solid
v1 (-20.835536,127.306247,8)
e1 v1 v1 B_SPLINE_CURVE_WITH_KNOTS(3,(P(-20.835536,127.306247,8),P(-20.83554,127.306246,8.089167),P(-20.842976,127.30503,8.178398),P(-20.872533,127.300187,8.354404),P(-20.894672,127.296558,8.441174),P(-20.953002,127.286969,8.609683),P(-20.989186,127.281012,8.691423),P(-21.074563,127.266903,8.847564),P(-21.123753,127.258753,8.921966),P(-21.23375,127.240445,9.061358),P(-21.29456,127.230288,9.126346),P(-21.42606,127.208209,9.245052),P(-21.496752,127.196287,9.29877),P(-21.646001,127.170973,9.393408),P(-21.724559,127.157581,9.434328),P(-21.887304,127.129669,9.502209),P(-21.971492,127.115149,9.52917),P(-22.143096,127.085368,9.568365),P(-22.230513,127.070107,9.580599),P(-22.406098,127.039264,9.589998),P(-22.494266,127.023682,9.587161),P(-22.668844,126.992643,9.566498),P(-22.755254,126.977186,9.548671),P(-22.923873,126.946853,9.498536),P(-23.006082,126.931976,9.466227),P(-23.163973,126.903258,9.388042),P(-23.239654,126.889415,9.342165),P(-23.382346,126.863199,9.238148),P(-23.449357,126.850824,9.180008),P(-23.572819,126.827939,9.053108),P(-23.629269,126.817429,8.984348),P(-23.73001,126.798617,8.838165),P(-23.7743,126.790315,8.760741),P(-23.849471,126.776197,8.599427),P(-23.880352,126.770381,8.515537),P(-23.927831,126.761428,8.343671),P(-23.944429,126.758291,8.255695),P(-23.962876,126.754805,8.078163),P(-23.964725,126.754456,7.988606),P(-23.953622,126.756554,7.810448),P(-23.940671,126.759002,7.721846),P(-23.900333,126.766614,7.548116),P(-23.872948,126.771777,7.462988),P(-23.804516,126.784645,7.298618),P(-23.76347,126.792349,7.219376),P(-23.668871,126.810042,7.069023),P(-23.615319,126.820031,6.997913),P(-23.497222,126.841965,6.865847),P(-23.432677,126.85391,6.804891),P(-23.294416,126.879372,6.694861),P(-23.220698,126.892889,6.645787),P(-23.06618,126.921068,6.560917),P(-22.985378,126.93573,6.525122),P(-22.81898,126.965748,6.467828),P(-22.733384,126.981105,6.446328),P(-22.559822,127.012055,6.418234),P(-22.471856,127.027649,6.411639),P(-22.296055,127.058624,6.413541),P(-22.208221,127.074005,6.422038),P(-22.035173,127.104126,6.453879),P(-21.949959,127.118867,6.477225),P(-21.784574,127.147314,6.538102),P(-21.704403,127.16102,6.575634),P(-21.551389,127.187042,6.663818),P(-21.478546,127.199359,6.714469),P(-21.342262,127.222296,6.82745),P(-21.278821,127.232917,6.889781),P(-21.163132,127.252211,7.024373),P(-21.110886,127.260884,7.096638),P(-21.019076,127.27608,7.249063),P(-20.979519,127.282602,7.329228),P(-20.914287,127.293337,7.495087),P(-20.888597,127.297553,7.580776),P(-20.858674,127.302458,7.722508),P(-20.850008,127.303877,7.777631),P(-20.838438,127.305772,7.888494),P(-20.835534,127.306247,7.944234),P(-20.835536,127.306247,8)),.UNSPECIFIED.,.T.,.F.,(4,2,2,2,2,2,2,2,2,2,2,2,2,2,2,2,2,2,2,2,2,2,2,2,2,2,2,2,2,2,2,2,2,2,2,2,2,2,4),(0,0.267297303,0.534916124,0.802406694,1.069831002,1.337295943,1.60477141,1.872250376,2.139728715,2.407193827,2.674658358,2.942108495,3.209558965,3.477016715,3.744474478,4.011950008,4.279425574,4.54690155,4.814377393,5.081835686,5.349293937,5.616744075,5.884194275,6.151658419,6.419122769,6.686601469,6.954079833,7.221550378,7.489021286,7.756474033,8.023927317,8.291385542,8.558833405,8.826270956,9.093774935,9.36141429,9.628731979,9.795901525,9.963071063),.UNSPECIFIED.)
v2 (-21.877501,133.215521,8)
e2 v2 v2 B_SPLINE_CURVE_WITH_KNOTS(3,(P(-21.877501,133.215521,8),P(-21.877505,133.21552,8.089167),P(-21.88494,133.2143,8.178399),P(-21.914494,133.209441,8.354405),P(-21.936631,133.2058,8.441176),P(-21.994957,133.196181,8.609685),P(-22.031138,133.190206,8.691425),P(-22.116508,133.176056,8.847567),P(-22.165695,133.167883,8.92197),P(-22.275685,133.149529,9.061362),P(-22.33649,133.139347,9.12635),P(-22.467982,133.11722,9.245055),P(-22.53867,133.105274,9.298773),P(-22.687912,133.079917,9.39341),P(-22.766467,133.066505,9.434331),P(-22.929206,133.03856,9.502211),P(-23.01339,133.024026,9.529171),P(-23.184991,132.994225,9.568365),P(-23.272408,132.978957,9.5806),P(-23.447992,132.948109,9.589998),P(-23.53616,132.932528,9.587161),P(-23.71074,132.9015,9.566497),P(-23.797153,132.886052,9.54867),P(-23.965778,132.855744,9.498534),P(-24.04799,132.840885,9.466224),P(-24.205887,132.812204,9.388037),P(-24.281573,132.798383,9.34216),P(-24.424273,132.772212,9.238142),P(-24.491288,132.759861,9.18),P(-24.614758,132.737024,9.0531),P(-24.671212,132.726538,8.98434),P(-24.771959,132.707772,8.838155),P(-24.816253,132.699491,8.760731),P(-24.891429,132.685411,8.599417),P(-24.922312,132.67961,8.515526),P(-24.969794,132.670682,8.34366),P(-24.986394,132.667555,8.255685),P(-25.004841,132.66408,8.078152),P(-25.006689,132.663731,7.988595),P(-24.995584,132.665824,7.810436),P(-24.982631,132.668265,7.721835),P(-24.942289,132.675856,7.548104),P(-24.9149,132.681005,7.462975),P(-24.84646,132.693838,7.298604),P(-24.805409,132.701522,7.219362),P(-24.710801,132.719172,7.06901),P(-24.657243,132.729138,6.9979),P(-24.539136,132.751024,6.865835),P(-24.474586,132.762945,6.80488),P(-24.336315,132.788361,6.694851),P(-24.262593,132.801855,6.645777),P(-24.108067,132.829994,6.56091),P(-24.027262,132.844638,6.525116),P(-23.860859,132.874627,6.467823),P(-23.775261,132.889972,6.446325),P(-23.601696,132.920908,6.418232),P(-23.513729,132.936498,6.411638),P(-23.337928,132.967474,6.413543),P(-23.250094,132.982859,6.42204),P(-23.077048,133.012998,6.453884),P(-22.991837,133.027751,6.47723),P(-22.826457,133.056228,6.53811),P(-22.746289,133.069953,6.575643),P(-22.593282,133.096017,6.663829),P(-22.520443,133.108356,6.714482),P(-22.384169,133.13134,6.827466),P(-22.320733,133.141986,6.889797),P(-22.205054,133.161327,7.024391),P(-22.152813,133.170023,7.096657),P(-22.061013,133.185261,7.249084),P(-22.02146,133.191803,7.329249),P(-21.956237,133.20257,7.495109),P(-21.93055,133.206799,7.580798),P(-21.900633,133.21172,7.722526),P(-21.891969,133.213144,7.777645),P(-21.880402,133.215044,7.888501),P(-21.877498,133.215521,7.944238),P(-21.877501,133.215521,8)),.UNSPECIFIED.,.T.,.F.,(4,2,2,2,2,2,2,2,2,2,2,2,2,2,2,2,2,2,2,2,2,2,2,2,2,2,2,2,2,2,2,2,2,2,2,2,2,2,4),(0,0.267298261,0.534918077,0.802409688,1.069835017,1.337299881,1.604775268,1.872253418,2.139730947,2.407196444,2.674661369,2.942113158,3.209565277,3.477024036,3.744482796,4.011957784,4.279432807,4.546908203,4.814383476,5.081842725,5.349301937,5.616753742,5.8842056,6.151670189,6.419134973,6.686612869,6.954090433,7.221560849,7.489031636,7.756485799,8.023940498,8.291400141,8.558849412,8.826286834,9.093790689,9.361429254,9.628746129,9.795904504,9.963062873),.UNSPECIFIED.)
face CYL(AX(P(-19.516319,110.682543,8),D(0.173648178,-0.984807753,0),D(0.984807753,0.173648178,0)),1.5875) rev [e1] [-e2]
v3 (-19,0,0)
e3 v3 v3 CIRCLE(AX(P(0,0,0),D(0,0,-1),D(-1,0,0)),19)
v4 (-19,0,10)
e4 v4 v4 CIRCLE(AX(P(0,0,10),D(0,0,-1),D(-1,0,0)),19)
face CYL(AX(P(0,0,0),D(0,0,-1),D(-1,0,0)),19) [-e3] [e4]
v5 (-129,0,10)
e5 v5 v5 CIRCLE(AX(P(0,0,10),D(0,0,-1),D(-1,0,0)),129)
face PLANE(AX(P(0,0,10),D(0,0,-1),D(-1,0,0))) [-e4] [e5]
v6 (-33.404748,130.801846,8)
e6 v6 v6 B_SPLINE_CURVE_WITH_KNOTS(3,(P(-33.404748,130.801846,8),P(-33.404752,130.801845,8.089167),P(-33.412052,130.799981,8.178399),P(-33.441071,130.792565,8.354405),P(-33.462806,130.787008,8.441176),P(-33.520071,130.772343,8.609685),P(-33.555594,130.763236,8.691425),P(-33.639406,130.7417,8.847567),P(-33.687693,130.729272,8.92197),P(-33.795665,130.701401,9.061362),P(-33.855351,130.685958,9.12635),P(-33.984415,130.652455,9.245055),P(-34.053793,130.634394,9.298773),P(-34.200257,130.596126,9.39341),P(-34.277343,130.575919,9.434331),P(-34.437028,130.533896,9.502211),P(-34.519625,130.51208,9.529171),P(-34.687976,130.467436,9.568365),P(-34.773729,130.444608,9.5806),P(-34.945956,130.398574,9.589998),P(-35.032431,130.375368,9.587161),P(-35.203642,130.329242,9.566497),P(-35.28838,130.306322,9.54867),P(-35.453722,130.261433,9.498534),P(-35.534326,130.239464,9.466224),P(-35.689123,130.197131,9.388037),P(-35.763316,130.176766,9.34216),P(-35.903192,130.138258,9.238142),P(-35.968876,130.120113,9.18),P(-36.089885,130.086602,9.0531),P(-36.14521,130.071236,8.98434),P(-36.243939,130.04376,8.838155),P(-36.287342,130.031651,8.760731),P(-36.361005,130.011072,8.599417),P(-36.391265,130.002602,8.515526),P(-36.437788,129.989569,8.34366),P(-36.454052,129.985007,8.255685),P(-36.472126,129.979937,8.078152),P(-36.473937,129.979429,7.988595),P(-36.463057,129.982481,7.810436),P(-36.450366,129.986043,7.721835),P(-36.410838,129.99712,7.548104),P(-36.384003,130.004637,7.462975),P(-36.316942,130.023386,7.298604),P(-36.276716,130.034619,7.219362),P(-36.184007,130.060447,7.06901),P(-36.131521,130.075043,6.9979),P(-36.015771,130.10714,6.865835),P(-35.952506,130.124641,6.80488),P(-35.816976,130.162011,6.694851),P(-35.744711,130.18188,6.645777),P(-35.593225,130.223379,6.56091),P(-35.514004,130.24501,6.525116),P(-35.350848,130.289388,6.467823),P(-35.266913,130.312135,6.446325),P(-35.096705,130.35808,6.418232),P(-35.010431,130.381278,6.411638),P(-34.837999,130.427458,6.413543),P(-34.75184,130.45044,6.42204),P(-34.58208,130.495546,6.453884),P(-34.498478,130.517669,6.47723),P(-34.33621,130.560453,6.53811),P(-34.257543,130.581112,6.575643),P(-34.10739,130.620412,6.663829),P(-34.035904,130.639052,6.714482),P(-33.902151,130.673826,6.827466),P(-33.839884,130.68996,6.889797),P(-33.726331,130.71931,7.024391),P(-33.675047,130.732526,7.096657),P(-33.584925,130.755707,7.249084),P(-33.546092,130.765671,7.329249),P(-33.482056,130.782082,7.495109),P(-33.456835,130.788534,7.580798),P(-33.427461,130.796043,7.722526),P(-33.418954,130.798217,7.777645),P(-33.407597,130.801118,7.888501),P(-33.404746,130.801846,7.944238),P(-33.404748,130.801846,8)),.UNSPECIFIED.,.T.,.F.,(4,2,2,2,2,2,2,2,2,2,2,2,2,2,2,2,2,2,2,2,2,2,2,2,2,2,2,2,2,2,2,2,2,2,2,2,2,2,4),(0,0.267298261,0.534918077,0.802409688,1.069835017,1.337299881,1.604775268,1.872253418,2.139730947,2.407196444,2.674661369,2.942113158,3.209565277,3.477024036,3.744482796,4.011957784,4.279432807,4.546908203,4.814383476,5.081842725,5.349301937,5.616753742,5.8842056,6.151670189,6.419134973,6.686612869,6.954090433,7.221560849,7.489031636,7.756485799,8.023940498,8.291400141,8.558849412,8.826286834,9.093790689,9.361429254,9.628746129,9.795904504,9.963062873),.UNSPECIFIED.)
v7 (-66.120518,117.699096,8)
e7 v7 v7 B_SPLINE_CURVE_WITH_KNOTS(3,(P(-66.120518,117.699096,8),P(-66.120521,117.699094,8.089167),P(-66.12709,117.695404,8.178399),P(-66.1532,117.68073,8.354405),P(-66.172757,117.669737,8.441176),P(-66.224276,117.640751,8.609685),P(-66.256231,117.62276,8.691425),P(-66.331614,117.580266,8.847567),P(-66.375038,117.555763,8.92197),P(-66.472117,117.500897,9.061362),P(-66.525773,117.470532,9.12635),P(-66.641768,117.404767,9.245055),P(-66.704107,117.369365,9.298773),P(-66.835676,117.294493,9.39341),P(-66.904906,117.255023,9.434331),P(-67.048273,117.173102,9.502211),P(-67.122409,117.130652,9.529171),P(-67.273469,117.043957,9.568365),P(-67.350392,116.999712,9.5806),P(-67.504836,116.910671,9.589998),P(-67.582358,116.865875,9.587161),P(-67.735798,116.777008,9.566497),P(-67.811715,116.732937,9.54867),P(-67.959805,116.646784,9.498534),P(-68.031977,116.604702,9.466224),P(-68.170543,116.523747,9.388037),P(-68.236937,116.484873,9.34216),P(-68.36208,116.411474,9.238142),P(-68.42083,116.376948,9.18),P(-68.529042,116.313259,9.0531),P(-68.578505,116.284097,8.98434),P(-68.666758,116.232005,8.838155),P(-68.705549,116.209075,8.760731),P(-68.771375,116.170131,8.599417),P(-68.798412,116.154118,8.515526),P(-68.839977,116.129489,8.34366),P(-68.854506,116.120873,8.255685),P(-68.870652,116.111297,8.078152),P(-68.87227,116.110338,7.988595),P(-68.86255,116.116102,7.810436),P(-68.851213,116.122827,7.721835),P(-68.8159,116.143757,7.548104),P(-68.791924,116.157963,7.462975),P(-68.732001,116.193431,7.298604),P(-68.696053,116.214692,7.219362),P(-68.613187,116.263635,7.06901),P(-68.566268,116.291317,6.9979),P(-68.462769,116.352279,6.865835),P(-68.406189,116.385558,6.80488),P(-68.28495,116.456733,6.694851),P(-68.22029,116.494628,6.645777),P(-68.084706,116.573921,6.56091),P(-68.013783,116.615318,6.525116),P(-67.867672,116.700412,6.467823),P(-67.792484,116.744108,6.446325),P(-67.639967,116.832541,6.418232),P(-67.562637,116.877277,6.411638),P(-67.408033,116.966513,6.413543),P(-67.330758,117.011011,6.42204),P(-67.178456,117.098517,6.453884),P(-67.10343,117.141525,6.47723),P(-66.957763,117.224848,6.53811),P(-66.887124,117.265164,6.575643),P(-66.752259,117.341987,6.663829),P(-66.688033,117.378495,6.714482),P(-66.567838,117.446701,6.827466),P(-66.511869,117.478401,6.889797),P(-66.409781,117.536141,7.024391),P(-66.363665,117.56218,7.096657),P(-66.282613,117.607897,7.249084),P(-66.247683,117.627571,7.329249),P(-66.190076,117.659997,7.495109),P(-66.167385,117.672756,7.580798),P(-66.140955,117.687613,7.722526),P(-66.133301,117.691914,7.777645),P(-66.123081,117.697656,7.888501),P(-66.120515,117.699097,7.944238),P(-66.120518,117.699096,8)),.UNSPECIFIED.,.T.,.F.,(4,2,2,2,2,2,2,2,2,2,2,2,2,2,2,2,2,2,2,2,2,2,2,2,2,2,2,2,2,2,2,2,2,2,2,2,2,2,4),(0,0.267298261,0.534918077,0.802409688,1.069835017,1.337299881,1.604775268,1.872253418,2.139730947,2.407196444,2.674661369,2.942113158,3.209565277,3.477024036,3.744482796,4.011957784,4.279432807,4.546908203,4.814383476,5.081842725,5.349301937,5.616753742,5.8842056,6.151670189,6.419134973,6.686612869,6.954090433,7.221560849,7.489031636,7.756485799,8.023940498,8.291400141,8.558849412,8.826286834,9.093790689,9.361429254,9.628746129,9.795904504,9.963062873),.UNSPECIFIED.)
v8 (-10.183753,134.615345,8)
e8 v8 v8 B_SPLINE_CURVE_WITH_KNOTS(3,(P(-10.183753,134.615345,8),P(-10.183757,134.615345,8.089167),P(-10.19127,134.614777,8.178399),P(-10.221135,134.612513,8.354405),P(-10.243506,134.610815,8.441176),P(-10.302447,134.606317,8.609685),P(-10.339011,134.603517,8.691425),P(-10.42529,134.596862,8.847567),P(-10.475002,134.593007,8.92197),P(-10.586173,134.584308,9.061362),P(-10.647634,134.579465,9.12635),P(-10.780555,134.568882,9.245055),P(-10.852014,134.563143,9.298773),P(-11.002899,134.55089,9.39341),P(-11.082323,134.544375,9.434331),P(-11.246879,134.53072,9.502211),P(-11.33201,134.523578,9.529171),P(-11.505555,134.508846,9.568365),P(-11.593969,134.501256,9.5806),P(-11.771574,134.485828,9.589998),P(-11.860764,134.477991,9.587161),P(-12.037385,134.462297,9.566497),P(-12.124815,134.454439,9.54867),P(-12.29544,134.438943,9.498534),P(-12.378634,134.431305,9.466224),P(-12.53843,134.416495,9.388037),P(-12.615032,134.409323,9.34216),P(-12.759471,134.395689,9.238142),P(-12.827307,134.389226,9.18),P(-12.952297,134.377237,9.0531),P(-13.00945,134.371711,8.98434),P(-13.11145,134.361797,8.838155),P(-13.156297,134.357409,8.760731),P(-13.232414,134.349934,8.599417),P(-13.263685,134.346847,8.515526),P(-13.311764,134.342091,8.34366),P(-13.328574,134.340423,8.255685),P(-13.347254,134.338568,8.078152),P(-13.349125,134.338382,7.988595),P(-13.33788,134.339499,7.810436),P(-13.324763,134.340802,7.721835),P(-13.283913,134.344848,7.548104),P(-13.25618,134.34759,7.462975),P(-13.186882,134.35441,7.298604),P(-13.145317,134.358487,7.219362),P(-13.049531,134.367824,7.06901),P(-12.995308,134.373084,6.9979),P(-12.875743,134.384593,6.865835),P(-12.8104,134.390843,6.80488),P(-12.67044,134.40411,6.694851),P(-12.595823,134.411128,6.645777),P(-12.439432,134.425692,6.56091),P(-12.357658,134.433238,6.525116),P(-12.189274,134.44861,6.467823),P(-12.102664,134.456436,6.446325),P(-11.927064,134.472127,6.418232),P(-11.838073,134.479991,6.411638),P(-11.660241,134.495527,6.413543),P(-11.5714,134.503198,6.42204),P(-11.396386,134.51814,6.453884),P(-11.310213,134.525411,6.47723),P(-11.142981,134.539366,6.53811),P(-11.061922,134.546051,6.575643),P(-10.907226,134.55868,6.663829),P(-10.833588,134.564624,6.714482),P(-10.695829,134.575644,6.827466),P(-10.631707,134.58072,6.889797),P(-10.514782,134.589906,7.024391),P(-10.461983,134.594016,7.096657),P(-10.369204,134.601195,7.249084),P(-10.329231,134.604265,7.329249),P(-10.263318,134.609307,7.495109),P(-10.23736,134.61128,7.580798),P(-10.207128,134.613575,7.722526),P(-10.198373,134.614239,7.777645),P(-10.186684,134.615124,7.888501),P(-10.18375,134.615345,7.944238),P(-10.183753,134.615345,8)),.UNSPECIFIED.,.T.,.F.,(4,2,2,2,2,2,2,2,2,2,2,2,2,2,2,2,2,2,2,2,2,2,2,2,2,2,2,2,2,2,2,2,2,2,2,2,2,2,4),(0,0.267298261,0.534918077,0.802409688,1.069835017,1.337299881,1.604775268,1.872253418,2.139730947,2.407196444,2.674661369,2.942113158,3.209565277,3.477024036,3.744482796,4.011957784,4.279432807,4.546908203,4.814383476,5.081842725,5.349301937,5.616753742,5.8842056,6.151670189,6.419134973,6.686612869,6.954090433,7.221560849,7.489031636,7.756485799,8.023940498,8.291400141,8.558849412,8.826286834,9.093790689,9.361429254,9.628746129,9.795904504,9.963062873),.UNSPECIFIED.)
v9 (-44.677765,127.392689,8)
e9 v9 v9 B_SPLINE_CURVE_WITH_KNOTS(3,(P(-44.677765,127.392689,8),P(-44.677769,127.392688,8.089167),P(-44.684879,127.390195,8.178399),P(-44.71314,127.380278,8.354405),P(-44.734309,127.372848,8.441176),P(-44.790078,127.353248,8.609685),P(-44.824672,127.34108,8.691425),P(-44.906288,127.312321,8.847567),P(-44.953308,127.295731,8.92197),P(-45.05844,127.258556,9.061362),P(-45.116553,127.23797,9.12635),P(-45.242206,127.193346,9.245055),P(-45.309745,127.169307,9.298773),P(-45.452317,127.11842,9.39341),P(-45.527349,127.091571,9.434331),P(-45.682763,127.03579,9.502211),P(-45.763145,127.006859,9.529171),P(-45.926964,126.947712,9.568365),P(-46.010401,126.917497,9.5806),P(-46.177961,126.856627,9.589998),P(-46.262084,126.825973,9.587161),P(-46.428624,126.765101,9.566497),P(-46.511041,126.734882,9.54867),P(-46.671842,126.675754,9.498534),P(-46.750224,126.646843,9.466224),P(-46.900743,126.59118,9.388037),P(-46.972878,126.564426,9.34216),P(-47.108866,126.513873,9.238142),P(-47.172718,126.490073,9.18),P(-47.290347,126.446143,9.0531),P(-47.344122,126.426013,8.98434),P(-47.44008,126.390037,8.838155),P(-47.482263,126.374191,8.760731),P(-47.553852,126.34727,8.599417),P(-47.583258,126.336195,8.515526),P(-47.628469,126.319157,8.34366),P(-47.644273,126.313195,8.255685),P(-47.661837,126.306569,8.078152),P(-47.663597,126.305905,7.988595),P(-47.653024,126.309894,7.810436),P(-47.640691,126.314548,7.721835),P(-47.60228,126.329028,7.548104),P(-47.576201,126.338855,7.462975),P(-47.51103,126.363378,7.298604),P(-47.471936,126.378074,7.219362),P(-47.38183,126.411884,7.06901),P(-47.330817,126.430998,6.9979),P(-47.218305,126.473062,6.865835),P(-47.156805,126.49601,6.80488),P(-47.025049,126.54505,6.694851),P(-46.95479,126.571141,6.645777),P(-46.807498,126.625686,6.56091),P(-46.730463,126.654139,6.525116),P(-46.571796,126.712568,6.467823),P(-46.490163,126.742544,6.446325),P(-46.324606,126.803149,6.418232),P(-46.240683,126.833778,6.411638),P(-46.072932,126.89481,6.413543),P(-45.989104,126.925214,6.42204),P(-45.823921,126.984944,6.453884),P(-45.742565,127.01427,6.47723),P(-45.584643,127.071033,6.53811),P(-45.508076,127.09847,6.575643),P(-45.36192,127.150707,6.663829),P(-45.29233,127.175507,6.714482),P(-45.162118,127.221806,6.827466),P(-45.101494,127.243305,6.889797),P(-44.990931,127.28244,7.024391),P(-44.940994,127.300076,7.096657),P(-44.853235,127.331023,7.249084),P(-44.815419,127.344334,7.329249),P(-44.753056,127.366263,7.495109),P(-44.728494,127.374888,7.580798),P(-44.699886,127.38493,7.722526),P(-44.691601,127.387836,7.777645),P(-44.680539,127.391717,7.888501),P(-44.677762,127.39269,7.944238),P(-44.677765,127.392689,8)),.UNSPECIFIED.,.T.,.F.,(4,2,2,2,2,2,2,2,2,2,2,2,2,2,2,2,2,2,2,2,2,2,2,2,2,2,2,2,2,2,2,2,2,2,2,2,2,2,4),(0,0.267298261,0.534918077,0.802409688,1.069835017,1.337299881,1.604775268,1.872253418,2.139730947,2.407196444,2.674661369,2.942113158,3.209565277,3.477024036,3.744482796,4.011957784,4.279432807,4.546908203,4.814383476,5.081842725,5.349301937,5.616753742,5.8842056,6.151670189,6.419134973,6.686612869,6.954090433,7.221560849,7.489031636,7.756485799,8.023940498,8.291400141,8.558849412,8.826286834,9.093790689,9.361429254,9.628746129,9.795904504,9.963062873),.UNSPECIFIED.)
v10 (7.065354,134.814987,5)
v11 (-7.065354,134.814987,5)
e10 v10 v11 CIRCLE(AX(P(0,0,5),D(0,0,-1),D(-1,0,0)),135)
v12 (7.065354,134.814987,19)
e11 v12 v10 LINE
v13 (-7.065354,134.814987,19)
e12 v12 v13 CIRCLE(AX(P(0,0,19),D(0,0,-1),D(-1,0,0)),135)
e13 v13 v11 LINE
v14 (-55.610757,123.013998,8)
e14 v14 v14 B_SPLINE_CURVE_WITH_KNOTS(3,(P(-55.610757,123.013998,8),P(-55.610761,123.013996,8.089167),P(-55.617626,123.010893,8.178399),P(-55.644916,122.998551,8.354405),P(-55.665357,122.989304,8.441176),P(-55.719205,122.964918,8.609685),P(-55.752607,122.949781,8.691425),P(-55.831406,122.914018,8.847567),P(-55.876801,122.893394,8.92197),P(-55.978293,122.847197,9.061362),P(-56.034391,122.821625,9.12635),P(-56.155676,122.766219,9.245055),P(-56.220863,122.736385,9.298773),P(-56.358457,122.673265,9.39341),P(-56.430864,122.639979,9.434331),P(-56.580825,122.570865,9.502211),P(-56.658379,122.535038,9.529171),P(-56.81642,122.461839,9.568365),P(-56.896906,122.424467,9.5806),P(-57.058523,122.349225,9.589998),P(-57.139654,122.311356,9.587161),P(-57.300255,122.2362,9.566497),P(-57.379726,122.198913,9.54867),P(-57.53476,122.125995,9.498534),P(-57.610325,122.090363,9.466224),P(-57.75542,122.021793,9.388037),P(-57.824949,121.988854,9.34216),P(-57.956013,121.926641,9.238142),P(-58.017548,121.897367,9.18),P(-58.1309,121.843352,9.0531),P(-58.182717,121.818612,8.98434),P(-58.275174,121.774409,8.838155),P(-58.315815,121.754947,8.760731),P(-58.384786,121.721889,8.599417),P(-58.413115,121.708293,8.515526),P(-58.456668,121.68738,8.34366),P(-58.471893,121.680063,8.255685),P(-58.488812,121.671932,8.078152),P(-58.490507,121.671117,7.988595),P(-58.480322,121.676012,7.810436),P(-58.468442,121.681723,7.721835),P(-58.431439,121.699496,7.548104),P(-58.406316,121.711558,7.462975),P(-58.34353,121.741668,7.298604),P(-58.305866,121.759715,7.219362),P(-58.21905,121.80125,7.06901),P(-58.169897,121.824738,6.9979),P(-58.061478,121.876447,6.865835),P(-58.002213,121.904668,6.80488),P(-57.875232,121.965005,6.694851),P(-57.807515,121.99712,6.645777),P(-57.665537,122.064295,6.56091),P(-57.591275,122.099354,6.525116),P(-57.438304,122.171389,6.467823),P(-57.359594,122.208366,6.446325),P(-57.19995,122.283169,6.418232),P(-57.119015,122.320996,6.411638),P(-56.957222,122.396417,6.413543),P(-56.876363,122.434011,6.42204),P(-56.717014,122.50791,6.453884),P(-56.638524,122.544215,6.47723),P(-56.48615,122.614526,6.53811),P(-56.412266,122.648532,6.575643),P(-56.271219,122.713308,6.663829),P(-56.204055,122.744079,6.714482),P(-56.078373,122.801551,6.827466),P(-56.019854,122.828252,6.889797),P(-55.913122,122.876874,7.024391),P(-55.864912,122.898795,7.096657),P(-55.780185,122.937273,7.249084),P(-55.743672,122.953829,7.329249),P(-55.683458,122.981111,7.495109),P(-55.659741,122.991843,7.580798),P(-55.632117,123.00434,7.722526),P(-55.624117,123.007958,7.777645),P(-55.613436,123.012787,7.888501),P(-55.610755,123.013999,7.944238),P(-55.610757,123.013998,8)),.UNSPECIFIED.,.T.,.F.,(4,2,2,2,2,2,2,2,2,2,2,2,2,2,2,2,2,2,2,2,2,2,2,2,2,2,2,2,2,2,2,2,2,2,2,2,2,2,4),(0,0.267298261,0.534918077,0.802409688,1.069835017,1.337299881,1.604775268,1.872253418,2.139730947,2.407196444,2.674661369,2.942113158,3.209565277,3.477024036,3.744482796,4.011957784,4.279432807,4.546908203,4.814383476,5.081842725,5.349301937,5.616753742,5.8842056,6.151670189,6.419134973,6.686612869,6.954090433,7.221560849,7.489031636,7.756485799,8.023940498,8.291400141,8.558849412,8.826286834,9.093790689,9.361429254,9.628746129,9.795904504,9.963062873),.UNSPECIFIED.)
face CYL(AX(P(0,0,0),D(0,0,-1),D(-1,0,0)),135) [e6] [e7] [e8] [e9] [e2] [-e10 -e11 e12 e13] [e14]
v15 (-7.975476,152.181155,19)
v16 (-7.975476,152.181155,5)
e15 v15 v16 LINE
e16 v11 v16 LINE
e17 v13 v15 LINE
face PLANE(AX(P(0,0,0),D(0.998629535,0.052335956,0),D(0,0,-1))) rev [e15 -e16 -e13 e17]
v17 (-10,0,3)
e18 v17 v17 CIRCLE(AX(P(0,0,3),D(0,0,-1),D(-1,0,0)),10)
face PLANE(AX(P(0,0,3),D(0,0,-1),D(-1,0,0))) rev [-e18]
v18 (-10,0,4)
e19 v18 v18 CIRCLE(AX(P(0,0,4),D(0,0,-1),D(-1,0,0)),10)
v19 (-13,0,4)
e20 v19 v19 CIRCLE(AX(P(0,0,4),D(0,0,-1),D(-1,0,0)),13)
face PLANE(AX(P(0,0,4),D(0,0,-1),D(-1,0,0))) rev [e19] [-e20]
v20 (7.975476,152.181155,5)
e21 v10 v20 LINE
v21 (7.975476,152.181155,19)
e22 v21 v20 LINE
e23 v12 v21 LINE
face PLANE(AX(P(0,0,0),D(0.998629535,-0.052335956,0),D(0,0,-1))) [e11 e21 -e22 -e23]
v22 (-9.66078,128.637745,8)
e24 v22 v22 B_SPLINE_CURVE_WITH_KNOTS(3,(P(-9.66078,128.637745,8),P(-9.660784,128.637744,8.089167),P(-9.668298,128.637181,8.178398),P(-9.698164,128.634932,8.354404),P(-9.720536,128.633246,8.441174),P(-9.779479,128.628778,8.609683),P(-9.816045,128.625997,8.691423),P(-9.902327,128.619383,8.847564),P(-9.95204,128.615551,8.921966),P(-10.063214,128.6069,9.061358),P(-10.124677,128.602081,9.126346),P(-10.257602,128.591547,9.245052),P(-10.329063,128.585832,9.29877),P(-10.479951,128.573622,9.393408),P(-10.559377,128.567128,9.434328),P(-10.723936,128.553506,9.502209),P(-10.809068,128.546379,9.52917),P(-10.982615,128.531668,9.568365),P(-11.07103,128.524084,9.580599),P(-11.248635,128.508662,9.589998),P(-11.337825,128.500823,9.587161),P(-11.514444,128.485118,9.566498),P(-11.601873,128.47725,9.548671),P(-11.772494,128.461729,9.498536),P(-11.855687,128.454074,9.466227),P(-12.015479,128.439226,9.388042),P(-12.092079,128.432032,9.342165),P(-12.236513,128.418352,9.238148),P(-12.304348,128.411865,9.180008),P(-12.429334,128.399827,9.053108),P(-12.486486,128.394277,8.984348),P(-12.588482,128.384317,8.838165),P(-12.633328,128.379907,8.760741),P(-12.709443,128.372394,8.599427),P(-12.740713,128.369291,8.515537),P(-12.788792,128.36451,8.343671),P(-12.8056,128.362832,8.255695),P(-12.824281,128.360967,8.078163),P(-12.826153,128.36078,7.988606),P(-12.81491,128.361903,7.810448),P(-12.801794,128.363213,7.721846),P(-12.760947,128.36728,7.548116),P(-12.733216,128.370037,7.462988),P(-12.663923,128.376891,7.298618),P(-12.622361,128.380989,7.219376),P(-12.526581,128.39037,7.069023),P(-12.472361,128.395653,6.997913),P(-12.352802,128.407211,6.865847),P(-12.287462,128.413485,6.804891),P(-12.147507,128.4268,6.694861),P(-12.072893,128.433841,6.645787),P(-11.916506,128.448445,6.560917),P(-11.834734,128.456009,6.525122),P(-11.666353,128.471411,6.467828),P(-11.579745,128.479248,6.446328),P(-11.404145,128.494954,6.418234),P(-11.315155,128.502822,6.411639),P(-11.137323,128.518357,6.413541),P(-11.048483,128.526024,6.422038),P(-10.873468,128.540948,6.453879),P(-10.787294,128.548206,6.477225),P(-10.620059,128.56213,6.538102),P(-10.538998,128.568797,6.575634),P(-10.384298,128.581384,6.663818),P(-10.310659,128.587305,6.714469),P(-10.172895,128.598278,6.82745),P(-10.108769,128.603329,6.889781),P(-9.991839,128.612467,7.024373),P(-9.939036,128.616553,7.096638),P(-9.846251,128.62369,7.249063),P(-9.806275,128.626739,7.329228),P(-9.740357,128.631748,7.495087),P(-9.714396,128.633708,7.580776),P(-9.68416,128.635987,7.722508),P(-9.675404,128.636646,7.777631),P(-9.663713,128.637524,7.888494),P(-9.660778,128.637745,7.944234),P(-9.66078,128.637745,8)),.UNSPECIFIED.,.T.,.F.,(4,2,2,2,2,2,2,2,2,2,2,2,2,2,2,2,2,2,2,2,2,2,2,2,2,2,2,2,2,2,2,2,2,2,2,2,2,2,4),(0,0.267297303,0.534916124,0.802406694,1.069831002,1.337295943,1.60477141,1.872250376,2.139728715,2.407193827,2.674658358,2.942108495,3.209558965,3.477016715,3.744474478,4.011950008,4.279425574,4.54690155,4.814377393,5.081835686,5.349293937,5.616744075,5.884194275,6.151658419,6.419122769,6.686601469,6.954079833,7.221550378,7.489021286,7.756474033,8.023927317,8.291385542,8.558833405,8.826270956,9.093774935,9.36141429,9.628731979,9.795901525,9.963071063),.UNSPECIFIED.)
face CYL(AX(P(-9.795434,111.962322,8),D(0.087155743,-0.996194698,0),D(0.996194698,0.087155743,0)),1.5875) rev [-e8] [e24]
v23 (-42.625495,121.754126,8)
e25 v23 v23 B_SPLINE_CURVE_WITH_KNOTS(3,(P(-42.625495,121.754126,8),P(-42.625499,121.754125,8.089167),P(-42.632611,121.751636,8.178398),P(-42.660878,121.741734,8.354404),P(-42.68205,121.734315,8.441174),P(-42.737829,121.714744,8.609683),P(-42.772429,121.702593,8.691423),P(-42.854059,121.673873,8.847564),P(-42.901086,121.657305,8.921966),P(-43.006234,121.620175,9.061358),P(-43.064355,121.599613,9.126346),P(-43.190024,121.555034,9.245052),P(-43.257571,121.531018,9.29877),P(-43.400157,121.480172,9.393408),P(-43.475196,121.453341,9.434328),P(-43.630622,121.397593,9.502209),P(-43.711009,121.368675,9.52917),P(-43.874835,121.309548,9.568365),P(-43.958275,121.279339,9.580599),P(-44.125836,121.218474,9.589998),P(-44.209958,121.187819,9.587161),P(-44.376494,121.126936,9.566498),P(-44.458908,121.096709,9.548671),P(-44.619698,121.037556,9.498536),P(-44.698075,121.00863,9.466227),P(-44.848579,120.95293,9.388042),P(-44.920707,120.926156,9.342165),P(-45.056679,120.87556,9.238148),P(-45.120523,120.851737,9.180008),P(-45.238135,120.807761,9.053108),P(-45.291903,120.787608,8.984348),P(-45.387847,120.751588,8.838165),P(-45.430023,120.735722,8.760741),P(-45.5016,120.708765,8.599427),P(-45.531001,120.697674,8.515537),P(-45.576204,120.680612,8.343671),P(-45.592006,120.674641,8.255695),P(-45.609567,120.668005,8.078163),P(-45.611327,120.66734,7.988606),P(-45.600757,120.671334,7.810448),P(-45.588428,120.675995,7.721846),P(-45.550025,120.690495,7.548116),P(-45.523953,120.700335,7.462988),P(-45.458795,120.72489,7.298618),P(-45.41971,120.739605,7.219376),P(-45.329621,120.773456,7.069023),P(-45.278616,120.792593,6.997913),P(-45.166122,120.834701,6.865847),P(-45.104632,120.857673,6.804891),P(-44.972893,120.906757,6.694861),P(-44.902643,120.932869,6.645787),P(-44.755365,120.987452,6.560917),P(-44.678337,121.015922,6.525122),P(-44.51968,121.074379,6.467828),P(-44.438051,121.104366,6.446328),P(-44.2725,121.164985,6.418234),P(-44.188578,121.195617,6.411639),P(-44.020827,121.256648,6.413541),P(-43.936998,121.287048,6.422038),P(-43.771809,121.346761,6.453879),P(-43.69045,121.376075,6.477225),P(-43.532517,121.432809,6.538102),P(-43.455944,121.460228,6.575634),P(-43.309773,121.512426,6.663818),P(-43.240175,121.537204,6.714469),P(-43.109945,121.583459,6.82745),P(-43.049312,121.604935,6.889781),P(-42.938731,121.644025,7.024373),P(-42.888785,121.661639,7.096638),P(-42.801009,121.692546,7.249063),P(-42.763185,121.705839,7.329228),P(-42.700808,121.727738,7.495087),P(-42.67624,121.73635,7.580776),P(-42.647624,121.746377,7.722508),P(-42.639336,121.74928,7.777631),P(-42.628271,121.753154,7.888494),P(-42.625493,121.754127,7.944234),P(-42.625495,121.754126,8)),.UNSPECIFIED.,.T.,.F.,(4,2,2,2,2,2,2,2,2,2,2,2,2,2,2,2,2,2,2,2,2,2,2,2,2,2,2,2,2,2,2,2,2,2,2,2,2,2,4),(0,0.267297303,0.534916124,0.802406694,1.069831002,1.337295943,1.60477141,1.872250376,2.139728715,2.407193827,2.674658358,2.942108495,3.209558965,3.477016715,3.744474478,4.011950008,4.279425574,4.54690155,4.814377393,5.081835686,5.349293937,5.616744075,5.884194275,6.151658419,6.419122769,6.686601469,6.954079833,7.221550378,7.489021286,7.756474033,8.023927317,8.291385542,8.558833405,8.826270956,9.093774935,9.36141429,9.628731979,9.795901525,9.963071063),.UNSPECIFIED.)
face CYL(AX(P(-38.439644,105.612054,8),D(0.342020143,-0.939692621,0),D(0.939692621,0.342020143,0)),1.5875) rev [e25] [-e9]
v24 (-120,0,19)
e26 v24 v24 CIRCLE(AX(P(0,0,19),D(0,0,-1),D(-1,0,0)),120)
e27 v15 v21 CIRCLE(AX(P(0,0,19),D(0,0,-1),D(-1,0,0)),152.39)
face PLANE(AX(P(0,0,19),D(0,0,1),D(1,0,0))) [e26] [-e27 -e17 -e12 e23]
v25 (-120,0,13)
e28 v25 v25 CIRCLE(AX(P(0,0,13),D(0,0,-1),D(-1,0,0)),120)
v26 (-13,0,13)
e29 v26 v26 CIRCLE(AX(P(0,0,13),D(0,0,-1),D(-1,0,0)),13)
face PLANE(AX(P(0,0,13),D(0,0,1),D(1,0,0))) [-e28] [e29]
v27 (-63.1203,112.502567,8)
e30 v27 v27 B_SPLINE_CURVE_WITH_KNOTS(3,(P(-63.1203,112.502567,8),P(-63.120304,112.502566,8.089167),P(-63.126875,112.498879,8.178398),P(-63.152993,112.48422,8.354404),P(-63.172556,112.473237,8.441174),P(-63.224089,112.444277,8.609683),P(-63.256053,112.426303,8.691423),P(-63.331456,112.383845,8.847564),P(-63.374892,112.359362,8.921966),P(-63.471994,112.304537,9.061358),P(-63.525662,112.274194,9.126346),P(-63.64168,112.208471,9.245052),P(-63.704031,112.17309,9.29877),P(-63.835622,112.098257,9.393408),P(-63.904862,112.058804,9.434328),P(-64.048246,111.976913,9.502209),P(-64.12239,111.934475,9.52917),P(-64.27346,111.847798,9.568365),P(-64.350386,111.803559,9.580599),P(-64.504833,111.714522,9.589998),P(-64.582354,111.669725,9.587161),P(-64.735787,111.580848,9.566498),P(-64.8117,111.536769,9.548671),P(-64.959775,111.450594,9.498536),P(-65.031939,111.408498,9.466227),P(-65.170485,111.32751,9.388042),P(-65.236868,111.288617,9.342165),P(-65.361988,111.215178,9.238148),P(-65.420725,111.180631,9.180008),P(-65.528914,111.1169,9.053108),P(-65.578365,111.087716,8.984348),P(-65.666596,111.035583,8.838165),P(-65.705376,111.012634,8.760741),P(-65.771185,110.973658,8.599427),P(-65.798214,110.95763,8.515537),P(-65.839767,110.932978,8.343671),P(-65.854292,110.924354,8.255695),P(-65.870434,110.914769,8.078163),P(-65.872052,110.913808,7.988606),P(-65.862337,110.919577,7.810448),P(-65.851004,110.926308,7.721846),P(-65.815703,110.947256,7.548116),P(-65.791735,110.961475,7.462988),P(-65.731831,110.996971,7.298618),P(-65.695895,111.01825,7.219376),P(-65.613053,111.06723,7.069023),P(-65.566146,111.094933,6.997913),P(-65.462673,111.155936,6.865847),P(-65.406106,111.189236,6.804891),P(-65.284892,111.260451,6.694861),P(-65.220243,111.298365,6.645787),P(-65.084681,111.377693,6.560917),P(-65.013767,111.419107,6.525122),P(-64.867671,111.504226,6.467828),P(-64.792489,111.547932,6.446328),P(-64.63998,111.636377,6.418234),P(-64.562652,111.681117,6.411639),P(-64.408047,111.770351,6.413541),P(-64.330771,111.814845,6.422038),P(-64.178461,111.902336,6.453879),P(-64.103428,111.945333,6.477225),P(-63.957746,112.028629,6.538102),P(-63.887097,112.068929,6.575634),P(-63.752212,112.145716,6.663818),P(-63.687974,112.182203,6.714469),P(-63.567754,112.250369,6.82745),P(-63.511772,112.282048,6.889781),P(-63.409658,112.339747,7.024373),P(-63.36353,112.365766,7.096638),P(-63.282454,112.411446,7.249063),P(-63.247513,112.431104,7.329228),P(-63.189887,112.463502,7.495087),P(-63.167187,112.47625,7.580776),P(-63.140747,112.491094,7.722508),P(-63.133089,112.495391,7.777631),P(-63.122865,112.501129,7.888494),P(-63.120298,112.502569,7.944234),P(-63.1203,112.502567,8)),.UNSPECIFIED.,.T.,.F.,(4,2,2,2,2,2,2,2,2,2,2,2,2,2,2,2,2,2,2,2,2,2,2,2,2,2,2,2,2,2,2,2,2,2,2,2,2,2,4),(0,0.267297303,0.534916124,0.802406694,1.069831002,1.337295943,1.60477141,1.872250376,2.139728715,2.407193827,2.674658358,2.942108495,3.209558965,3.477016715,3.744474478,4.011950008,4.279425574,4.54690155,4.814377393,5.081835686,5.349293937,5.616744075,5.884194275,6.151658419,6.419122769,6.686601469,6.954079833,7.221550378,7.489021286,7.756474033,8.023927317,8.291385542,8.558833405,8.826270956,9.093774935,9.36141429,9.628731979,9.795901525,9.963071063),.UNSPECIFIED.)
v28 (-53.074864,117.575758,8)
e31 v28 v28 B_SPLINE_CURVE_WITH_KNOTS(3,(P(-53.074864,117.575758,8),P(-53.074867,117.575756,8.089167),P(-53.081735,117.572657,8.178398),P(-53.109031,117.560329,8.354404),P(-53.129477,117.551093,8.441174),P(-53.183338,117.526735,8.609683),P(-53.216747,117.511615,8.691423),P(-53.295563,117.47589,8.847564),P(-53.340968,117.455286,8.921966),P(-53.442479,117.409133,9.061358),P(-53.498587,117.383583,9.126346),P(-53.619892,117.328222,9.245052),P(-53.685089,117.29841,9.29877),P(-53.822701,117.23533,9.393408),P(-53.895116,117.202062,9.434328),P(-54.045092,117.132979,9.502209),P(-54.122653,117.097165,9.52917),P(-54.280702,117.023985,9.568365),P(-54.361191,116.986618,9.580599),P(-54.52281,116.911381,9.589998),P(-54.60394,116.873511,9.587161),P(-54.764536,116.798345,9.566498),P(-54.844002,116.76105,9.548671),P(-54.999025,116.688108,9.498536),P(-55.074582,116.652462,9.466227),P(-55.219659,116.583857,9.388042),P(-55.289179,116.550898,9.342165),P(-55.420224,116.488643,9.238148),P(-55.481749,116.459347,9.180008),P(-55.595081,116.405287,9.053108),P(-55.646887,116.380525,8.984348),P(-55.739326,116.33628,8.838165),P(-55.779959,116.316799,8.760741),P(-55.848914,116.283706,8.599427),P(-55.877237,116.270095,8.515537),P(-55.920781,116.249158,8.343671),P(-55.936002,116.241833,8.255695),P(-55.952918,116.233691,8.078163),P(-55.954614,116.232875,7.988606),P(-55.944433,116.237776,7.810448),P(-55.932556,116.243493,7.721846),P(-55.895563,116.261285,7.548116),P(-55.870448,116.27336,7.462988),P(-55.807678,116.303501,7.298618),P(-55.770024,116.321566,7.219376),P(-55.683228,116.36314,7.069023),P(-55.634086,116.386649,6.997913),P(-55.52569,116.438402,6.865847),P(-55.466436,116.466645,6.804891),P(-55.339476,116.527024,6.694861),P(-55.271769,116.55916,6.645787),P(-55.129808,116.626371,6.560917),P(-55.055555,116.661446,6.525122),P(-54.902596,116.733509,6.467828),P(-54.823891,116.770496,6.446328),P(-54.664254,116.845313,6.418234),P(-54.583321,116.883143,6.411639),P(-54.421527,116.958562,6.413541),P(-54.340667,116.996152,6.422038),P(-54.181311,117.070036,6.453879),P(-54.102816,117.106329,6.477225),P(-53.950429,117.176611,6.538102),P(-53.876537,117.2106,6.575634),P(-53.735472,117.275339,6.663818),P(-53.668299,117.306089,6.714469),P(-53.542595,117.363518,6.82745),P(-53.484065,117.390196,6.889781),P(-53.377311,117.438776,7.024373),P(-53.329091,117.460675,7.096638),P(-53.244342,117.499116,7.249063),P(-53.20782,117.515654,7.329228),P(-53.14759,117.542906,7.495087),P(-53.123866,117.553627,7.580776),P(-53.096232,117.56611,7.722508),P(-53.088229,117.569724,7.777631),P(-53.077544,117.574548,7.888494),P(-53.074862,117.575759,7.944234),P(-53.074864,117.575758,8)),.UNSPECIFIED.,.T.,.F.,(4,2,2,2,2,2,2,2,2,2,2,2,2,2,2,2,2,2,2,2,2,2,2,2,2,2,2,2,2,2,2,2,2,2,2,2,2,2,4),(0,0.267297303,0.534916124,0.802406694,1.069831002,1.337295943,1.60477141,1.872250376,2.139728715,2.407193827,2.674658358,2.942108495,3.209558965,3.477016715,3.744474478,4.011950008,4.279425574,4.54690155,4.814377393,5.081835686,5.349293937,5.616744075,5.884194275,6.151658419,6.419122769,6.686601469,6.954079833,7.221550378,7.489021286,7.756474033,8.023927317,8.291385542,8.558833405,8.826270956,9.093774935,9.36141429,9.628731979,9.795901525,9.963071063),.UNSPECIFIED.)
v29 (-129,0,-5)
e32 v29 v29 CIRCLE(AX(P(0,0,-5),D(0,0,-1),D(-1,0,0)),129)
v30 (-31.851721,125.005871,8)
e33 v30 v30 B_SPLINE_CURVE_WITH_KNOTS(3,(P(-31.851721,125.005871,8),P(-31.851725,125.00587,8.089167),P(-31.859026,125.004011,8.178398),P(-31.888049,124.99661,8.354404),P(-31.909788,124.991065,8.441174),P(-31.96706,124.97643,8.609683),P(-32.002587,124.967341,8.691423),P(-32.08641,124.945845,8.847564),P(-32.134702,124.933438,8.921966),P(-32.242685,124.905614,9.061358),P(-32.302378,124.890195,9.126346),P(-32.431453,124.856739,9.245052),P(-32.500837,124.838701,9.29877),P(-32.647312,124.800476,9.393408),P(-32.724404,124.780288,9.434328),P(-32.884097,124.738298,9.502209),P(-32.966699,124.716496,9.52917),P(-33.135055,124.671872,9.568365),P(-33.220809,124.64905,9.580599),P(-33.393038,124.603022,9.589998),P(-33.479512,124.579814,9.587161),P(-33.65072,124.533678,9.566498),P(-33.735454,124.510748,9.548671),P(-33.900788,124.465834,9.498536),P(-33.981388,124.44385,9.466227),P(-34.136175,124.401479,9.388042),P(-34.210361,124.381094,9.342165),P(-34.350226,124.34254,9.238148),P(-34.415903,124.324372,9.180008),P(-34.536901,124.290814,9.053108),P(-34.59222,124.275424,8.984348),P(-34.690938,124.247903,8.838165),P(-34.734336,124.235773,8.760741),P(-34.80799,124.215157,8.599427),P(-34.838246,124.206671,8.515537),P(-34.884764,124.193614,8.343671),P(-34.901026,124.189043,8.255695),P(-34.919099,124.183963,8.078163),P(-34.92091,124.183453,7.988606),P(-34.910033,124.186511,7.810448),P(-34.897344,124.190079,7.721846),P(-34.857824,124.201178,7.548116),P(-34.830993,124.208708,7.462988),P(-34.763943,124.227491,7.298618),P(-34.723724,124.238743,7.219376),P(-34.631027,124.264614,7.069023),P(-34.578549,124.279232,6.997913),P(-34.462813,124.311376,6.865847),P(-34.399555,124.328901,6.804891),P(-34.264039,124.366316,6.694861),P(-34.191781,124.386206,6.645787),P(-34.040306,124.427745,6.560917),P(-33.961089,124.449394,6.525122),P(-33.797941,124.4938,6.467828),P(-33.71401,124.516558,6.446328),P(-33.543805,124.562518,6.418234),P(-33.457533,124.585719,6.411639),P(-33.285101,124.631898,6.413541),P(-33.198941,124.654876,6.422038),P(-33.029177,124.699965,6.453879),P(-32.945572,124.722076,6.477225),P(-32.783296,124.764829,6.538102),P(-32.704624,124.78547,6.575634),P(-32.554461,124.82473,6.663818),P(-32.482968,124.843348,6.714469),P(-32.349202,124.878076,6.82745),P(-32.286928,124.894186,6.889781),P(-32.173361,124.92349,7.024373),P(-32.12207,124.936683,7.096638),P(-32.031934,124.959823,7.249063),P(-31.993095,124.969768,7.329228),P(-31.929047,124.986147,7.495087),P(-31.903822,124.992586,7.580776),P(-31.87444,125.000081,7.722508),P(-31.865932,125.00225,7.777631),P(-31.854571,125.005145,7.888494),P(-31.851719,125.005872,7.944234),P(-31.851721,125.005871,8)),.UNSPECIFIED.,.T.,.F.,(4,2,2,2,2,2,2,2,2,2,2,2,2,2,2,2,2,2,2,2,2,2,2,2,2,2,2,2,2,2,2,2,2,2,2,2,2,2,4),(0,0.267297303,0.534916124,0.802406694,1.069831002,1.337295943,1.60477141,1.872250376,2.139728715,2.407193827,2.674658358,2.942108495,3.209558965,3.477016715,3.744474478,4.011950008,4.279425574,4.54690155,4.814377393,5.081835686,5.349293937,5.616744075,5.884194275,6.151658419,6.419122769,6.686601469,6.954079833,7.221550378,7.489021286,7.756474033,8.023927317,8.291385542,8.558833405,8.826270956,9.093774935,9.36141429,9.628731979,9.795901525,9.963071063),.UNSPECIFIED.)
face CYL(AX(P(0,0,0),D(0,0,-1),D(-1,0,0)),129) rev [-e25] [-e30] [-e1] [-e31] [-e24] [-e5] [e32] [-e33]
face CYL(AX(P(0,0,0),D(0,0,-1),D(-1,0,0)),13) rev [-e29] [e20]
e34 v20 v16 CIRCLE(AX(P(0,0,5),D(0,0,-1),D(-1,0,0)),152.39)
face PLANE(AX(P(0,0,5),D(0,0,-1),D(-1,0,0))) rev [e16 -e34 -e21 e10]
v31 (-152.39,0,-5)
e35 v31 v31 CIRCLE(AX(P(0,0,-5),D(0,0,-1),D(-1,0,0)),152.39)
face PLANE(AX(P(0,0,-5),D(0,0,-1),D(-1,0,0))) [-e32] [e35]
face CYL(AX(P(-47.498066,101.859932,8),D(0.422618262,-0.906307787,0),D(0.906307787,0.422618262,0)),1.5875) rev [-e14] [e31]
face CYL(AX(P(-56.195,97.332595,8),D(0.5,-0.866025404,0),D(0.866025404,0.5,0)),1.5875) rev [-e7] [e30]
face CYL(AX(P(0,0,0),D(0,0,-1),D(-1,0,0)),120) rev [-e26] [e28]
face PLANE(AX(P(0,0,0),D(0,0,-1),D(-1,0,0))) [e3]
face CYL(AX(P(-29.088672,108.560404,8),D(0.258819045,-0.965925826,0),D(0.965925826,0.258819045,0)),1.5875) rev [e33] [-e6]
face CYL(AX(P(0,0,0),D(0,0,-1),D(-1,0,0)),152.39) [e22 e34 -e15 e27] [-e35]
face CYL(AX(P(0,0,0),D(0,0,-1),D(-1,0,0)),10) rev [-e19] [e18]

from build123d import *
from build123d.topology import SkipClean

# Parameters (mm, degrees)
SKETCH1_3_W              = 17.39
SKETCH1_3_H              = 14
REVOLVE2_ANGLE           = 3
REVOLVE2_OTHER_WAY_ANGLE = 3
CIRPATTERN1_COUNT        = 6
CIRPATTERN1_ANGLE        = 25


with BuildPart() as part:
    # Sketch1 → Revolve1 (revolve)
    with BuildSketch(Plane.YZ, mode=Mode.PRIVATE) as revolve1_sk:
        Polygon((120, 13), (13, 13), (13, 4), (10, 4), (10, 3), (0, 3), (0, 0), (19, 0), (19, 10), (129, 10), (129, -5), (152.39, -5), (152.39, 5), (135, 5), (135, 19), (120, 19), align=None)
    revolve(revolve1_sk.sketch.rotate(Axis((0, 0, 0), (0, 0, 1)), 90), axis=Axis((0, 0, 0), (0, 0, 1)))

    # Sketch1<3> → Revolve2 (revolve)
    with BuildSketch(Plane.YZ):
        with Locations((143.695, 12)):
            Rectangle(SKETCH1_3_W, SKETCH1_3_H)
    revolve(axis=Axis((0, 0, 0), (0, 0, 1)), revolution_arc=REVOLVE2_ANGLE)

    # Sketch1<3> → Revolve2 other way (revolve)
    with SkipClean():  # the faces are left unmerged after this step: merging them gives an invalid solid
        with BuildSketch(Plane.YZ):
            with Locations((143.695, 12)):
                Rectangle(SKETCH1_3_W, SKETCH1_3_H)
        revolve(axis=Axis((0, 0, 0), (0, 0, -1)), revolution_arc=REVOLVE2_OTHER_WAY_ANGLE)
    add(part.part.scale(1), mode=Mode.REPLACE)  # the faces are merged on a copy

    # Sketch2 → Cut-Revolve4 (revolve, cut)
    with BuildSketch(Plane(origin=(0, 0, 8), x_dir=(0, 1, 0), z_dir=(0, 0, 1)), mode=Mode.PRIVATE) as cut_revolve4_sk:
        Polygon((111.823962377, 11.376893011), (151.671750301, 14.863122721), (151.810110042, 13.281663637), (111.962322119, 9.795433927), align=None)
    cut_revolve4 = revolve(cut_revolve4_sk.sketch.rotate(Axis((-9.795433927, 111.962322119, 8), (-0.08715574274765829, 0.9961946980917455, 0)), 180), axis=Axis((-9.795433927, 111.962322119, 8), (-0.08715574274765829, 0.9961946980917455, 0)), mode=Mode.SUBTRACT)

    # CirPattern1: Cut-Revolve4 ×6 about axis
    cirpattern1_axis = Axis((0, 0, 0), (0, 0, 1))
    for i in range(1, CIRPATTERN1_COUNT):
        add(cut_revolve4.rotate(cirpattern1_axis, i * CIRPATTERN1_ANGLE / (CIRPATTERN1_COUNT - 1)), mode=Mode.SUBTRACT)


solid = part.part
